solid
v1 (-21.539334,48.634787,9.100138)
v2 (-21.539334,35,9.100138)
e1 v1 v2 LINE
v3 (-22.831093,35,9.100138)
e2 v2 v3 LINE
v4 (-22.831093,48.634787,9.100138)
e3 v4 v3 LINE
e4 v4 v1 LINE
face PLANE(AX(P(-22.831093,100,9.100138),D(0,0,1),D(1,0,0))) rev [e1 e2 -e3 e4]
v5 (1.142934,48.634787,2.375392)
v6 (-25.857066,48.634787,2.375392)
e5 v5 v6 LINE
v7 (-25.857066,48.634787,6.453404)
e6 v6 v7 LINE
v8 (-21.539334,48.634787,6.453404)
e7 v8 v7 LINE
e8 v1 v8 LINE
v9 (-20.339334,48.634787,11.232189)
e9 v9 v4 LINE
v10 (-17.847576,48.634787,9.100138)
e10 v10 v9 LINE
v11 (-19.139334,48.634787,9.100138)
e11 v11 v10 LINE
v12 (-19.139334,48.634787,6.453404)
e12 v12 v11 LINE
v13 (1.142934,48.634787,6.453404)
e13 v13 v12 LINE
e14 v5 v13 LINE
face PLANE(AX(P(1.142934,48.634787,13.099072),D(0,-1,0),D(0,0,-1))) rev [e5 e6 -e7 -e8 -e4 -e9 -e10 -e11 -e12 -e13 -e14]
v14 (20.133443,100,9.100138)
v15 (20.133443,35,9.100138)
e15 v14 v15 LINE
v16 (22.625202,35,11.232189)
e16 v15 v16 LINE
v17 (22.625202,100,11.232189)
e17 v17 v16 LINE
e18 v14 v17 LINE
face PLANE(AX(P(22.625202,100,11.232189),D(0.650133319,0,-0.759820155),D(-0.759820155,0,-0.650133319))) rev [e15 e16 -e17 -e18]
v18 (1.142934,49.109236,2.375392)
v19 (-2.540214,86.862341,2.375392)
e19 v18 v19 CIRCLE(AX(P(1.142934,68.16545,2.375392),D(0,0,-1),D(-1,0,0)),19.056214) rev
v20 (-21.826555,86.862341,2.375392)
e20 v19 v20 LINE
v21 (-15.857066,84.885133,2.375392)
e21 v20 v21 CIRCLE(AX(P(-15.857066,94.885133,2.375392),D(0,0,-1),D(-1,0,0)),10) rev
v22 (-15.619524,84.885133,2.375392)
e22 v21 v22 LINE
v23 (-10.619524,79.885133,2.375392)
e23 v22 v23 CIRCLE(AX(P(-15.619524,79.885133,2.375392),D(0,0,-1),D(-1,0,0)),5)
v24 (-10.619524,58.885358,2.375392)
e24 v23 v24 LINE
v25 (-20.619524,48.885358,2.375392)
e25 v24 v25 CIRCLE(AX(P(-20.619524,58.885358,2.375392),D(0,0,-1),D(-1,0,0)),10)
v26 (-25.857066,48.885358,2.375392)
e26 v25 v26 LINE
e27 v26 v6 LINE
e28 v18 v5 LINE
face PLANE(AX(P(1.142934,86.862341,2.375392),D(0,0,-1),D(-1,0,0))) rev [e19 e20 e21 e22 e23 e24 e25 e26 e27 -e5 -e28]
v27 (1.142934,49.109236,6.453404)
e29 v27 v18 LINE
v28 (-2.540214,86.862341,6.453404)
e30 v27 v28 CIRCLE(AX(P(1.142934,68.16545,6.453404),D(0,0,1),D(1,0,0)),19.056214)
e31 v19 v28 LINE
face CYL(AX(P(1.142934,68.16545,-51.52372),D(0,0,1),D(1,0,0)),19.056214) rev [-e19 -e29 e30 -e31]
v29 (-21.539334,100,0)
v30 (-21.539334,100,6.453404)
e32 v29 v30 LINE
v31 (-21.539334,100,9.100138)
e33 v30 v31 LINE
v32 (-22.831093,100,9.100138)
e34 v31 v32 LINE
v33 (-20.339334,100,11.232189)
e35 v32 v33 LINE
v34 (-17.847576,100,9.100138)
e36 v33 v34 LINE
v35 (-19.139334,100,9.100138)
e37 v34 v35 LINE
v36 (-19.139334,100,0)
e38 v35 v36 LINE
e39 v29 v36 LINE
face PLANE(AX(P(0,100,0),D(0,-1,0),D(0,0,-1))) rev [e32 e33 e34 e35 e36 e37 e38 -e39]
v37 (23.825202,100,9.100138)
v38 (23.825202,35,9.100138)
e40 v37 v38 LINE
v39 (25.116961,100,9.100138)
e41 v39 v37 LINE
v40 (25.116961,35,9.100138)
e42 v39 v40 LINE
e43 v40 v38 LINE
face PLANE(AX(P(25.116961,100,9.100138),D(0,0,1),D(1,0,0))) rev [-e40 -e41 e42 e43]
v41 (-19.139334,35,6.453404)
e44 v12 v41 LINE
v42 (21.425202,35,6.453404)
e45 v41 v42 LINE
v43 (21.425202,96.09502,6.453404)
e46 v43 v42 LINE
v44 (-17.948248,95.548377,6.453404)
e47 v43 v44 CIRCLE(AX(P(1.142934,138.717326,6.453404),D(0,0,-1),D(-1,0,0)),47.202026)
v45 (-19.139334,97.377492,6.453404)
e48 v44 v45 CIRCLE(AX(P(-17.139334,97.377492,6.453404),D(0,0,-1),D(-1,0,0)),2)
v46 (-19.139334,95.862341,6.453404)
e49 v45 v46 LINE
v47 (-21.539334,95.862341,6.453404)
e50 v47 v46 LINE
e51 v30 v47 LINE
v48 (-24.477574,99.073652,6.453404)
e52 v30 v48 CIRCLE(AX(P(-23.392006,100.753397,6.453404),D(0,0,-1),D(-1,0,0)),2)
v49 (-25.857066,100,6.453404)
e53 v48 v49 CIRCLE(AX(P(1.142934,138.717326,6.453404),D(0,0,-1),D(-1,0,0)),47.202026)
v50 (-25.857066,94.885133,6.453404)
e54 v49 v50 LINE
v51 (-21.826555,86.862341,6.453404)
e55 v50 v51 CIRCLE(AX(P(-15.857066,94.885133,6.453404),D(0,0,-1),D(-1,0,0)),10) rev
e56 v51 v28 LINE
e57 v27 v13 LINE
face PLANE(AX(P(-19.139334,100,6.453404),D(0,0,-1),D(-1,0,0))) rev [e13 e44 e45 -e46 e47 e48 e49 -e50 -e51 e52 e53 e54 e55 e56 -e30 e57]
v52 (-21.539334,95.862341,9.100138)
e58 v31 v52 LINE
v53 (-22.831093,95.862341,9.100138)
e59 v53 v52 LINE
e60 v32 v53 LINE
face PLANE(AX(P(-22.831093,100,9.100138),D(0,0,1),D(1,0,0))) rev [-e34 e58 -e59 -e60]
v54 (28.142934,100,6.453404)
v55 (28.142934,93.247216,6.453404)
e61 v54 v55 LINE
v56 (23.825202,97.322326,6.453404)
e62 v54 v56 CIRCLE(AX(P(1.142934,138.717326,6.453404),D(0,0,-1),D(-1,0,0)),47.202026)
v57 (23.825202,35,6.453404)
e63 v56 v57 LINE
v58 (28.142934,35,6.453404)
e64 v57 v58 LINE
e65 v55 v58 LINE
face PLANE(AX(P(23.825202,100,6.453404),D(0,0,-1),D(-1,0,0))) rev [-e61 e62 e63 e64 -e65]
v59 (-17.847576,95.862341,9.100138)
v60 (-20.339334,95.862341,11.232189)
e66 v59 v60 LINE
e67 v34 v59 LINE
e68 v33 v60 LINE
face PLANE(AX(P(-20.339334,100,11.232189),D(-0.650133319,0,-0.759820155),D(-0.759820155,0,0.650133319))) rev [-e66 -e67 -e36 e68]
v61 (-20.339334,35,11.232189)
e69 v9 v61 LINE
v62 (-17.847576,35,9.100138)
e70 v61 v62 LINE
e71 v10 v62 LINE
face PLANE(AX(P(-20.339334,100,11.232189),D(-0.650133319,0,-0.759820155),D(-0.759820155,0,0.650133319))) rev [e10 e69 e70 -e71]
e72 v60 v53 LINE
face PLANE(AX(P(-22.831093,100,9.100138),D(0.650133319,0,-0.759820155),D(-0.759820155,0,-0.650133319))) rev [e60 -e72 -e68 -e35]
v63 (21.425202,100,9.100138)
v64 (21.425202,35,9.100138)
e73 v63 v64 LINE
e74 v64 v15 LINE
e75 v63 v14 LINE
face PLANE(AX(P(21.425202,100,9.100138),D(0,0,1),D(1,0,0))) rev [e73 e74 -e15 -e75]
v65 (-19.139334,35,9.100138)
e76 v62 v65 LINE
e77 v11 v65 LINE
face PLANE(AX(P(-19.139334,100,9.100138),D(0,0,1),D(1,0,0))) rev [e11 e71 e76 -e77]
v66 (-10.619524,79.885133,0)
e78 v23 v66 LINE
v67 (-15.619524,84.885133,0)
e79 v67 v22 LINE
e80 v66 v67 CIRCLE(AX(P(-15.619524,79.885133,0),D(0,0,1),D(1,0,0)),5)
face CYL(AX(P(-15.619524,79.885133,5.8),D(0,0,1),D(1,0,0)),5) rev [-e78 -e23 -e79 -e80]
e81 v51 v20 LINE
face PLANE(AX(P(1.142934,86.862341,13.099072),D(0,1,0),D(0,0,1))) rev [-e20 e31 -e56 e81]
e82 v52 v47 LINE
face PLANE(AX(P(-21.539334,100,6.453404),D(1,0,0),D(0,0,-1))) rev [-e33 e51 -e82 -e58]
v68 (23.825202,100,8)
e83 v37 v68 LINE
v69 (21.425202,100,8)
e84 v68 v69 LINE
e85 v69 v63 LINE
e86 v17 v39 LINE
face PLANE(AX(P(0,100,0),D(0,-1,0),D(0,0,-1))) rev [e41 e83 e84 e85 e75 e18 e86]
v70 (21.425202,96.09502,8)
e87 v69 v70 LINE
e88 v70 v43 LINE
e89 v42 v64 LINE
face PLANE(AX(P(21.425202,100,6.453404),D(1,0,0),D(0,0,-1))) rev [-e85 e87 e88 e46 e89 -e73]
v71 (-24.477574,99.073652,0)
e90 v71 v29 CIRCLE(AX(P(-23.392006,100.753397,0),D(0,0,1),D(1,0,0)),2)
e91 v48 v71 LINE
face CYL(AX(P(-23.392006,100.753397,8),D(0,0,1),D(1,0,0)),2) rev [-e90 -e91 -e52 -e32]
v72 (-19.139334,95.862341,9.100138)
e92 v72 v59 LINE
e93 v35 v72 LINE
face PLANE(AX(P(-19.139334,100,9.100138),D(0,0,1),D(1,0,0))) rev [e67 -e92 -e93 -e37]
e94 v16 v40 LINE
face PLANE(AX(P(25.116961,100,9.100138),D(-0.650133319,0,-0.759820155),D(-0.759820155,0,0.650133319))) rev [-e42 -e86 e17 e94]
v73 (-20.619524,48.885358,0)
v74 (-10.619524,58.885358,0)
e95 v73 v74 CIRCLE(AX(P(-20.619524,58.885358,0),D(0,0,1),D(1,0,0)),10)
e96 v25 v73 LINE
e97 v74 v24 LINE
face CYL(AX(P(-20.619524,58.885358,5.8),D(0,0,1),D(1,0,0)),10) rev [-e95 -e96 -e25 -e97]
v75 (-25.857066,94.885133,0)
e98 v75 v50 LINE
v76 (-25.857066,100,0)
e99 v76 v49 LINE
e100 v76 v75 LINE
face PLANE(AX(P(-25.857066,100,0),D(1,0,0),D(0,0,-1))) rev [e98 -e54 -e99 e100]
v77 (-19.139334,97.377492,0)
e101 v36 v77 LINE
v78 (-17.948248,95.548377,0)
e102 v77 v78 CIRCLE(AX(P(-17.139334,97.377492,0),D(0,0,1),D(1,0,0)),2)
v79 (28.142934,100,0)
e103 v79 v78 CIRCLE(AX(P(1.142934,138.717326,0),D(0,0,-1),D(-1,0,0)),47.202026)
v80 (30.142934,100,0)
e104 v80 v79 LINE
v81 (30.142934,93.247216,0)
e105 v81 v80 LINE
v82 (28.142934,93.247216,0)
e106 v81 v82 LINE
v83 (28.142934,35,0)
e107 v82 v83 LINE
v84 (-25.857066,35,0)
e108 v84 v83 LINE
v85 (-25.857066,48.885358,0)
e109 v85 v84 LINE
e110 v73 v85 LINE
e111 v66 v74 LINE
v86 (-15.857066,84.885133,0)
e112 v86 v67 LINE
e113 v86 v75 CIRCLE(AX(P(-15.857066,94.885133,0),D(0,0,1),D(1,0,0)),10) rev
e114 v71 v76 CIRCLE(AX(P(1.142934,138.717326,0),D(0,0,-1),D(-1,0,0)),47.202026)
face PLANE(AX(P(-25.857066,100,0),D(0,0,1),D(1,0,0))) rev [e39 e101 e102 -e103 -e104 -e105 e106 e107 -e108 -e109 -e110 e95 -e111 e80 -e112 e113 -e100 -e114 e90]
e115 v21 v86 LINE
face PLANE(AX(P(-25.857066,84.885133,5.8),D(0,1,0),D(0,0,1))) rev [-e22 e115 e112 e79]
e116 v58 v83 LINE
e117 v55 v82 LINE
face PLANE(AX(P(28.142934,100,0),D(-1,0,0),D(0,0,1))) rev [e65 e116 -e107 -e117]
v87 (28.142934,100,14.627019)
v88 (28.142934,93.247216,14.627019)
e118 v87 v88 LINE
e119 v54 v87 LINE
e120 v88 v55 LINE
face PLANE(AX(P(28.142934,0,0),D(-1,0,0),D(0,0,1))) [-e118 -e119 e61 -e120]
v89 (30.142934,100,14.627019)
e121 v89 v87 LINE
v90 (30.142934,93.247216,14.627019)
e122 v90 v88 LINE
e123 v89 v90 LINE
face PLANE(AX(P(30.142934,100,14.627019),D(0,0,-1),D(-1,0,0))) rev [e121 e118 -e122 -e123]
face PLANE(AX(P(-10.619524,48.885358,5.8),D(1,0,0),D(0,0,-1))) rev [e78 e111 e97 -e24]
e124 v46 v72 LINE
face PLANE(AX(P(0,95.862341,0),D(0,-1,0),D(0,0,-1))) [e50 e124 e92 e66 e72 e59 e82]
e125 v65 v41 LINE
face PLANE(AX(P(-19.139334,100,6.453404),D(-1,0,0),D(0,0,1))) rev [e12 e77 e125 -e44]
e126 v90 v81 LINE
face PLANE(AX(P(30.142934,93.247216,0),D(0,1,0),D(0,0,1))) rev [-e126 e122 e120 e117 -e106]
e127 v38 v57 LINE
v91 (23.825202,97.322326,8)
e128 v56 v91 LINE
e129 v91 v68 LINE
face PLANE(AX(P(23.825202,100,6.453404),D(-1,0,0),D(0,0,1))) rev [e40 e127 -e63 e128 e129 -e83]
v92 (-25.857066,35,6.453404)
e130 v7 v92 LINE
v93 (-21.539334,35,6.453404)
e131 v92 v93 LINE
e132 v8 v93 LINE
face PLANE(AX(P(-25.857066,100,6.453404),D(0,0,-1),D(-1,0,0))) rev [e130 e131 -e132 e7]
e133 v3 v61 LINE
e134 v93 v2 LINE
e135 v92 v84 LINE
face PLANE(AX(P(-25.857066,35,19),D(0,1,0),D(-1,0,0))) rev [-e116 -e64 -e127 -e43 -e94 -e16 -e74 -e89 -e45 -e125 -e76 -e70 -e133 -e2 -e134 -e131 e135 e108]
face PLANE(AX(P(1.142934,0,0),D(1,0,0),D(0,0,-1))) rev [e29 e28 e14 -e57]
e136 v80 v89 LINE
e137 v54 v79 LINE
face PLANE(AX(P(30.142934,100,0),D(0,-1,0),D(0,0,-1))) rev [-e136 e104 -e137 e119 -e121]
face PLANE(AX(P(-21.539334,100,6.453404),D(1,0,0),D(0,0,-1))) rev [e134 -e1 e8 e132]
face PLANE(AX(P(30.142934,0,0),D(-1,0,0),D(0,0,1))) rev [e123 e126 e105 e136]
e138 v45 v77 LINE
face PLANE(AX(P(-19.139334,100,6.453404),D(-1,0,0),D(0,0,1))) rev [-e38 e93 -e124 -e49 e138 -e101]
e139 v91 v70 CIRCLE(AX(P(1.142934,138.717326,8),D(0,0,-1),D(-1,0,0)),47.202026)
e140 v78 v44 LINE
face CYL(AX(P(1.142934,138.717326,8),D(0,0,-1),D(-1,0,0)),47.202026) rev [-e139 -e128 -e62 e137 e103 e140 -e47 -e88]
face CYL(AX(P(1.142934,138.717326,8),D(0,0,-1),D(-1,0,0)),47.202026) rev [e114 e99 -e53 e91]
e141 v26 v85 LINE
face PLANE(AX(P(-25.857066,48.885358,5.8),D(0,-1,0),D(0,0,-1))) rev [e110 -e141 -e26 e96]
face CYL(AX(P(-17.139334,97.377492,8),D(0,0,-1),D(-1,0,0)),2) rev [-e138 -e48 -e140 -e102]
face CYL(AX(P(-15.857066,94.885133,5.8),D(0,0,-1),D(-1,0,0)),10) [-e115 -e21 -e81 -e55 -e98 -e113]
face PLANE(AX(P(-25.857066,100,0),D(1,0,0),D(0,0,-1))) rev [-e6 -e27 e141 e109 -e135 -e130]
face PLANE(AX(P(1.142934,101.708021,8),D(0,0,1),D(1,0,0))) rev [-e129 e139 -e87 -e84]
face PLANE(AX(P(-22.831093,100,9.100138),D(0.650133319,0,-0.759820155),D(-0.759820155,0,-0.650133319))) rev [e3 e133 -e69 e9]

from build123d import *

# Parameters (mm, degrees)
SALIENTE_EXTRUIR1_DEPTH = 100
SKETCH3_W               = 10.723679857
SKETCH3_H               = 38.227553418
CUT_EXTRUDE1_DEPTH      = 27
SKETCH5_R               = 19.056213919
CUT_EXTRUDE2_DEPTH      = 4.078011603
CUT_EXTRUDE3_DEPTH      = 8
SKETCH7_W               = 15.237542525
SKETCH7_H               = 35.999775061
CUT_EXTRUDE4_DEPTH      = 5.8
FILLET1_R               = 10
FILLET2_R               = 10
FILLET3_R               = 5
SKETCH8_W               = 14.627019037
SKETCH8_H               = 6.752783555
BOSS_EXTRUDE1_DEPTH     = 2
SKETCH11_W              = 54
SKETCH11_H              = 35
CUT_EXTRUDE6_DEPTH      = 19
SKETCH12_W              = 5.502183779
SKETCH12_H              = 5.157792635
CUT_EXTRUDE7_DEPTH      = 9
BOSS_EXTRUDE2_START     = 8
BOSS_EXTRUDE2_DEPTH     = 8
FILLET4_R               = 2
FILLET5_R               = 2


with BuildPart() as part:
    # Croquis1 → Saliente-Extruir1 (new body)
    with BuildSketch(Plane(origin=(0, 0, 0), x_dir=(1, 0, 0), z_dir=(0, 1, 0))):
        Polygon((-22.831092882, -9.100137773), (-21.539334245, -9.100137773), (-21.539334245, -6.453403554), (-25.857066178, -6.453403554), (-25.857066178, 0), (28.142933822, 0), (28.142933822, -6.453403554), (23.825201889, -6.453403554), (23.825201889, -9.100137773), (25.116960526, -9.100137773), (22.625201889, -11.232188763), (20.133443253, -9.100137773), (21.425201889, -9.100137773), (21.425201889, -6.453403554), (-19.139334245, -6.453403554), (-19.139334245, -9.100137773), (-17.847575609, -9.100137773), (-20.339334245, -11.232188763), align=None)
    extrude(amount=SALIENTE_EXTRUIR1_DEPTH)

    # Sketch3 → Cut-Extrude1 (cut)
    with BuildSketch(Plane.ZY.offset(25.857066178)):
        with Locations((7.73723188, 67.748563888)):
            Rectangle(SKETCH3_W, SKETCH3_H)
    extrude(amount=-CUT_EXTRUDE1_DEPTH, mode=Mode.SUBTRACT)

    # Sketch5 → Cut-Extrude2 (cut)
    with BuildSketch(Plane.XY.offset(6.453403554)):
        with Locations((1.142933822, 68.165450094)):
            Circle(SKETCH5_R)
    extrude(amount=-CUT_EXTRUDE2_DEPTH, mode=Mode.SUBTRACT)

    # Sketch6 → Cut-Extrude3 (cut)
    with BuildSketch(Plane(origin=(0, 0, 0), x_dir=(-1, 0, 0), z_dir=(0, 0, -1))):
        with BuildLine():
            ThreePointArc((-28.142933822, 100), (-1.142933822, 91.515299145), (25.857066178, 100))
            ThreePointArc((25.857066178, 100), (-1.142933822, 109.141720496), (-28.142933822, 100))
        make_face()
    extrude(amount=-CUT_EXTRUDE3_DEPTH, mode=Mode.SUBTRACT)

    # Sketch7 → Cut-Extrude4 (cut)
    with BuildSketch(Plane(origin=(0, 0, 0), x_dir=(-1, 0, 0), z_dir=(0, 0, -1))):
        with Locations((18.238294915, 66.88524583)):
            Rectangle(SKETCH7_W, SKETCH7_H)
    extrude(amount=-CUT_EXTRUDE4_DEPTH, mode=Mode.SUBTRACT)

    # Fillet1
    fillet1_edges = [part.edges().sort_by_distance(p)[0] for p in [
        (-25.857066178, 84.885133361, 1.187695976),
    ]]
    fillet(fillet1_edges, radius=FILLET1_R)

    # Fillet2
    fillet2_edges = [part.edges().sort_by_distance(p)[0] for p in [
        (-10.619523653, 48.8853583, 1.187695976),
    ]]
    fillet(fillet2_edges, radius=FILLET2_R)

    # Fillet3
    fillet3_edges = [part.edges().sort_by_distance(p)[0] for p in [
        (-10.619523653, 84.885133361, 1.187695976),
    ]]
    fillet(fillet3_edges, radius=FILLET3_R)

    # Sketch8 → Boss-Extrude1 (add)
    with BuildSketch(Plane(origin=(28.142933822, 0, 0), x_dir=(0, 0, -1), z_dir=(1, 0, 0))):
        with Locations((-7.313509519, 96.623608222)):
            Rectangle(SKETCH8_W, SKETCH8_H)
    extrude(amount=BOSS_EXTRUDE1_DEPTH)

    # Sketch11 → Cut-Extrude6 (cut)
    with BuildSketch(Plane(origin=(0, 0, 0), x_dir=(-1, 0, 0), z_dir=(0, 0, -1))):
        with Locations((-1.142933822, 17.5)):
            Rectangle(SKETCH11_W, SKETCH11_H)
    extrude(amount=-CUT_EXTRUDE6_DEPTH, mode=Mode.SUBTRACT)

    # Sketch12 → Cut-Extrude7 (cut)
    with BuildSketch(Plane.XZ.offset(-86.862340597)):
        with Locations((-20.48547756, 9.032299872)):
            Rectangle(SKETCH12_W, SKETCH12_H)
    extrude(amount=-CUT_EXTRUDE7_DEPTH, mode=Mode.SUBTRACT)

    # Sketch13 → Boss-Extrude2 (add)
    with BuildSketch(Plane(origin=(0, 0, 8), x_dir=(-1, 0, 0), z_dir=(0, 0, -1)).offset(BOSS_EXTRUDE2_START)):
        with BuildLine():
            Line((21.539334245, 100), (19.139334245, 100))
            Line((19.139334245, 100), (19.139334245, 96.095020365))
            ThreePointArc((19.139334245, 96.095020365), (20.348097119, 96.6915372), (21.539334245, 97.322325698))
            Line((21.539334245, 97.322325698), (21.539334245, 100))
        make_face()
    extrude(amount=-BOSS_EXTRUDE2_DEPTH)

    # Fillet4
    # the kernel refuses this fillet: 2 mm, written as the material it adds along each edge
    with BuildSketch(Plane(origin=(-21.539334245, 97.322325698, 0), x_dir=(0, 1, 0), z_dir=(0, 0, 1))) as fillet4_piece_1:
        with BuildLine():
            CenterArc((3.431070837, 1.852672033), FILLET4_R, 147.126635273, 100.744049636)
            Line((1.751326275, 2.938240182), (1.717731384, 2.959951545))
            ThreePointArc((1.717731384, 2.959951545), (0.814679242, 1.505469297), (-0.035079002, 0.019221436))
            Line((-0.035079002, 0.019221436), (0, -0.04))
            ThreePointArc((0, -0.04), (1.338837151, -0.04), (2.662606371, -0.037053441))
            Line((2.662606371, -0.037053441), (2.677674302, 0))
        make_face()
    extrude(amount=6.453403554)

    # Fillet5
    fillet5_edges = [part.edges().sort_by_distance(p)[0] for p in [
        (-19.139334245, 96.095020365, 3.226701777),
    ]]
    fillet(fillet5_edges, radius=FILLET5_R)


solid = part.part
